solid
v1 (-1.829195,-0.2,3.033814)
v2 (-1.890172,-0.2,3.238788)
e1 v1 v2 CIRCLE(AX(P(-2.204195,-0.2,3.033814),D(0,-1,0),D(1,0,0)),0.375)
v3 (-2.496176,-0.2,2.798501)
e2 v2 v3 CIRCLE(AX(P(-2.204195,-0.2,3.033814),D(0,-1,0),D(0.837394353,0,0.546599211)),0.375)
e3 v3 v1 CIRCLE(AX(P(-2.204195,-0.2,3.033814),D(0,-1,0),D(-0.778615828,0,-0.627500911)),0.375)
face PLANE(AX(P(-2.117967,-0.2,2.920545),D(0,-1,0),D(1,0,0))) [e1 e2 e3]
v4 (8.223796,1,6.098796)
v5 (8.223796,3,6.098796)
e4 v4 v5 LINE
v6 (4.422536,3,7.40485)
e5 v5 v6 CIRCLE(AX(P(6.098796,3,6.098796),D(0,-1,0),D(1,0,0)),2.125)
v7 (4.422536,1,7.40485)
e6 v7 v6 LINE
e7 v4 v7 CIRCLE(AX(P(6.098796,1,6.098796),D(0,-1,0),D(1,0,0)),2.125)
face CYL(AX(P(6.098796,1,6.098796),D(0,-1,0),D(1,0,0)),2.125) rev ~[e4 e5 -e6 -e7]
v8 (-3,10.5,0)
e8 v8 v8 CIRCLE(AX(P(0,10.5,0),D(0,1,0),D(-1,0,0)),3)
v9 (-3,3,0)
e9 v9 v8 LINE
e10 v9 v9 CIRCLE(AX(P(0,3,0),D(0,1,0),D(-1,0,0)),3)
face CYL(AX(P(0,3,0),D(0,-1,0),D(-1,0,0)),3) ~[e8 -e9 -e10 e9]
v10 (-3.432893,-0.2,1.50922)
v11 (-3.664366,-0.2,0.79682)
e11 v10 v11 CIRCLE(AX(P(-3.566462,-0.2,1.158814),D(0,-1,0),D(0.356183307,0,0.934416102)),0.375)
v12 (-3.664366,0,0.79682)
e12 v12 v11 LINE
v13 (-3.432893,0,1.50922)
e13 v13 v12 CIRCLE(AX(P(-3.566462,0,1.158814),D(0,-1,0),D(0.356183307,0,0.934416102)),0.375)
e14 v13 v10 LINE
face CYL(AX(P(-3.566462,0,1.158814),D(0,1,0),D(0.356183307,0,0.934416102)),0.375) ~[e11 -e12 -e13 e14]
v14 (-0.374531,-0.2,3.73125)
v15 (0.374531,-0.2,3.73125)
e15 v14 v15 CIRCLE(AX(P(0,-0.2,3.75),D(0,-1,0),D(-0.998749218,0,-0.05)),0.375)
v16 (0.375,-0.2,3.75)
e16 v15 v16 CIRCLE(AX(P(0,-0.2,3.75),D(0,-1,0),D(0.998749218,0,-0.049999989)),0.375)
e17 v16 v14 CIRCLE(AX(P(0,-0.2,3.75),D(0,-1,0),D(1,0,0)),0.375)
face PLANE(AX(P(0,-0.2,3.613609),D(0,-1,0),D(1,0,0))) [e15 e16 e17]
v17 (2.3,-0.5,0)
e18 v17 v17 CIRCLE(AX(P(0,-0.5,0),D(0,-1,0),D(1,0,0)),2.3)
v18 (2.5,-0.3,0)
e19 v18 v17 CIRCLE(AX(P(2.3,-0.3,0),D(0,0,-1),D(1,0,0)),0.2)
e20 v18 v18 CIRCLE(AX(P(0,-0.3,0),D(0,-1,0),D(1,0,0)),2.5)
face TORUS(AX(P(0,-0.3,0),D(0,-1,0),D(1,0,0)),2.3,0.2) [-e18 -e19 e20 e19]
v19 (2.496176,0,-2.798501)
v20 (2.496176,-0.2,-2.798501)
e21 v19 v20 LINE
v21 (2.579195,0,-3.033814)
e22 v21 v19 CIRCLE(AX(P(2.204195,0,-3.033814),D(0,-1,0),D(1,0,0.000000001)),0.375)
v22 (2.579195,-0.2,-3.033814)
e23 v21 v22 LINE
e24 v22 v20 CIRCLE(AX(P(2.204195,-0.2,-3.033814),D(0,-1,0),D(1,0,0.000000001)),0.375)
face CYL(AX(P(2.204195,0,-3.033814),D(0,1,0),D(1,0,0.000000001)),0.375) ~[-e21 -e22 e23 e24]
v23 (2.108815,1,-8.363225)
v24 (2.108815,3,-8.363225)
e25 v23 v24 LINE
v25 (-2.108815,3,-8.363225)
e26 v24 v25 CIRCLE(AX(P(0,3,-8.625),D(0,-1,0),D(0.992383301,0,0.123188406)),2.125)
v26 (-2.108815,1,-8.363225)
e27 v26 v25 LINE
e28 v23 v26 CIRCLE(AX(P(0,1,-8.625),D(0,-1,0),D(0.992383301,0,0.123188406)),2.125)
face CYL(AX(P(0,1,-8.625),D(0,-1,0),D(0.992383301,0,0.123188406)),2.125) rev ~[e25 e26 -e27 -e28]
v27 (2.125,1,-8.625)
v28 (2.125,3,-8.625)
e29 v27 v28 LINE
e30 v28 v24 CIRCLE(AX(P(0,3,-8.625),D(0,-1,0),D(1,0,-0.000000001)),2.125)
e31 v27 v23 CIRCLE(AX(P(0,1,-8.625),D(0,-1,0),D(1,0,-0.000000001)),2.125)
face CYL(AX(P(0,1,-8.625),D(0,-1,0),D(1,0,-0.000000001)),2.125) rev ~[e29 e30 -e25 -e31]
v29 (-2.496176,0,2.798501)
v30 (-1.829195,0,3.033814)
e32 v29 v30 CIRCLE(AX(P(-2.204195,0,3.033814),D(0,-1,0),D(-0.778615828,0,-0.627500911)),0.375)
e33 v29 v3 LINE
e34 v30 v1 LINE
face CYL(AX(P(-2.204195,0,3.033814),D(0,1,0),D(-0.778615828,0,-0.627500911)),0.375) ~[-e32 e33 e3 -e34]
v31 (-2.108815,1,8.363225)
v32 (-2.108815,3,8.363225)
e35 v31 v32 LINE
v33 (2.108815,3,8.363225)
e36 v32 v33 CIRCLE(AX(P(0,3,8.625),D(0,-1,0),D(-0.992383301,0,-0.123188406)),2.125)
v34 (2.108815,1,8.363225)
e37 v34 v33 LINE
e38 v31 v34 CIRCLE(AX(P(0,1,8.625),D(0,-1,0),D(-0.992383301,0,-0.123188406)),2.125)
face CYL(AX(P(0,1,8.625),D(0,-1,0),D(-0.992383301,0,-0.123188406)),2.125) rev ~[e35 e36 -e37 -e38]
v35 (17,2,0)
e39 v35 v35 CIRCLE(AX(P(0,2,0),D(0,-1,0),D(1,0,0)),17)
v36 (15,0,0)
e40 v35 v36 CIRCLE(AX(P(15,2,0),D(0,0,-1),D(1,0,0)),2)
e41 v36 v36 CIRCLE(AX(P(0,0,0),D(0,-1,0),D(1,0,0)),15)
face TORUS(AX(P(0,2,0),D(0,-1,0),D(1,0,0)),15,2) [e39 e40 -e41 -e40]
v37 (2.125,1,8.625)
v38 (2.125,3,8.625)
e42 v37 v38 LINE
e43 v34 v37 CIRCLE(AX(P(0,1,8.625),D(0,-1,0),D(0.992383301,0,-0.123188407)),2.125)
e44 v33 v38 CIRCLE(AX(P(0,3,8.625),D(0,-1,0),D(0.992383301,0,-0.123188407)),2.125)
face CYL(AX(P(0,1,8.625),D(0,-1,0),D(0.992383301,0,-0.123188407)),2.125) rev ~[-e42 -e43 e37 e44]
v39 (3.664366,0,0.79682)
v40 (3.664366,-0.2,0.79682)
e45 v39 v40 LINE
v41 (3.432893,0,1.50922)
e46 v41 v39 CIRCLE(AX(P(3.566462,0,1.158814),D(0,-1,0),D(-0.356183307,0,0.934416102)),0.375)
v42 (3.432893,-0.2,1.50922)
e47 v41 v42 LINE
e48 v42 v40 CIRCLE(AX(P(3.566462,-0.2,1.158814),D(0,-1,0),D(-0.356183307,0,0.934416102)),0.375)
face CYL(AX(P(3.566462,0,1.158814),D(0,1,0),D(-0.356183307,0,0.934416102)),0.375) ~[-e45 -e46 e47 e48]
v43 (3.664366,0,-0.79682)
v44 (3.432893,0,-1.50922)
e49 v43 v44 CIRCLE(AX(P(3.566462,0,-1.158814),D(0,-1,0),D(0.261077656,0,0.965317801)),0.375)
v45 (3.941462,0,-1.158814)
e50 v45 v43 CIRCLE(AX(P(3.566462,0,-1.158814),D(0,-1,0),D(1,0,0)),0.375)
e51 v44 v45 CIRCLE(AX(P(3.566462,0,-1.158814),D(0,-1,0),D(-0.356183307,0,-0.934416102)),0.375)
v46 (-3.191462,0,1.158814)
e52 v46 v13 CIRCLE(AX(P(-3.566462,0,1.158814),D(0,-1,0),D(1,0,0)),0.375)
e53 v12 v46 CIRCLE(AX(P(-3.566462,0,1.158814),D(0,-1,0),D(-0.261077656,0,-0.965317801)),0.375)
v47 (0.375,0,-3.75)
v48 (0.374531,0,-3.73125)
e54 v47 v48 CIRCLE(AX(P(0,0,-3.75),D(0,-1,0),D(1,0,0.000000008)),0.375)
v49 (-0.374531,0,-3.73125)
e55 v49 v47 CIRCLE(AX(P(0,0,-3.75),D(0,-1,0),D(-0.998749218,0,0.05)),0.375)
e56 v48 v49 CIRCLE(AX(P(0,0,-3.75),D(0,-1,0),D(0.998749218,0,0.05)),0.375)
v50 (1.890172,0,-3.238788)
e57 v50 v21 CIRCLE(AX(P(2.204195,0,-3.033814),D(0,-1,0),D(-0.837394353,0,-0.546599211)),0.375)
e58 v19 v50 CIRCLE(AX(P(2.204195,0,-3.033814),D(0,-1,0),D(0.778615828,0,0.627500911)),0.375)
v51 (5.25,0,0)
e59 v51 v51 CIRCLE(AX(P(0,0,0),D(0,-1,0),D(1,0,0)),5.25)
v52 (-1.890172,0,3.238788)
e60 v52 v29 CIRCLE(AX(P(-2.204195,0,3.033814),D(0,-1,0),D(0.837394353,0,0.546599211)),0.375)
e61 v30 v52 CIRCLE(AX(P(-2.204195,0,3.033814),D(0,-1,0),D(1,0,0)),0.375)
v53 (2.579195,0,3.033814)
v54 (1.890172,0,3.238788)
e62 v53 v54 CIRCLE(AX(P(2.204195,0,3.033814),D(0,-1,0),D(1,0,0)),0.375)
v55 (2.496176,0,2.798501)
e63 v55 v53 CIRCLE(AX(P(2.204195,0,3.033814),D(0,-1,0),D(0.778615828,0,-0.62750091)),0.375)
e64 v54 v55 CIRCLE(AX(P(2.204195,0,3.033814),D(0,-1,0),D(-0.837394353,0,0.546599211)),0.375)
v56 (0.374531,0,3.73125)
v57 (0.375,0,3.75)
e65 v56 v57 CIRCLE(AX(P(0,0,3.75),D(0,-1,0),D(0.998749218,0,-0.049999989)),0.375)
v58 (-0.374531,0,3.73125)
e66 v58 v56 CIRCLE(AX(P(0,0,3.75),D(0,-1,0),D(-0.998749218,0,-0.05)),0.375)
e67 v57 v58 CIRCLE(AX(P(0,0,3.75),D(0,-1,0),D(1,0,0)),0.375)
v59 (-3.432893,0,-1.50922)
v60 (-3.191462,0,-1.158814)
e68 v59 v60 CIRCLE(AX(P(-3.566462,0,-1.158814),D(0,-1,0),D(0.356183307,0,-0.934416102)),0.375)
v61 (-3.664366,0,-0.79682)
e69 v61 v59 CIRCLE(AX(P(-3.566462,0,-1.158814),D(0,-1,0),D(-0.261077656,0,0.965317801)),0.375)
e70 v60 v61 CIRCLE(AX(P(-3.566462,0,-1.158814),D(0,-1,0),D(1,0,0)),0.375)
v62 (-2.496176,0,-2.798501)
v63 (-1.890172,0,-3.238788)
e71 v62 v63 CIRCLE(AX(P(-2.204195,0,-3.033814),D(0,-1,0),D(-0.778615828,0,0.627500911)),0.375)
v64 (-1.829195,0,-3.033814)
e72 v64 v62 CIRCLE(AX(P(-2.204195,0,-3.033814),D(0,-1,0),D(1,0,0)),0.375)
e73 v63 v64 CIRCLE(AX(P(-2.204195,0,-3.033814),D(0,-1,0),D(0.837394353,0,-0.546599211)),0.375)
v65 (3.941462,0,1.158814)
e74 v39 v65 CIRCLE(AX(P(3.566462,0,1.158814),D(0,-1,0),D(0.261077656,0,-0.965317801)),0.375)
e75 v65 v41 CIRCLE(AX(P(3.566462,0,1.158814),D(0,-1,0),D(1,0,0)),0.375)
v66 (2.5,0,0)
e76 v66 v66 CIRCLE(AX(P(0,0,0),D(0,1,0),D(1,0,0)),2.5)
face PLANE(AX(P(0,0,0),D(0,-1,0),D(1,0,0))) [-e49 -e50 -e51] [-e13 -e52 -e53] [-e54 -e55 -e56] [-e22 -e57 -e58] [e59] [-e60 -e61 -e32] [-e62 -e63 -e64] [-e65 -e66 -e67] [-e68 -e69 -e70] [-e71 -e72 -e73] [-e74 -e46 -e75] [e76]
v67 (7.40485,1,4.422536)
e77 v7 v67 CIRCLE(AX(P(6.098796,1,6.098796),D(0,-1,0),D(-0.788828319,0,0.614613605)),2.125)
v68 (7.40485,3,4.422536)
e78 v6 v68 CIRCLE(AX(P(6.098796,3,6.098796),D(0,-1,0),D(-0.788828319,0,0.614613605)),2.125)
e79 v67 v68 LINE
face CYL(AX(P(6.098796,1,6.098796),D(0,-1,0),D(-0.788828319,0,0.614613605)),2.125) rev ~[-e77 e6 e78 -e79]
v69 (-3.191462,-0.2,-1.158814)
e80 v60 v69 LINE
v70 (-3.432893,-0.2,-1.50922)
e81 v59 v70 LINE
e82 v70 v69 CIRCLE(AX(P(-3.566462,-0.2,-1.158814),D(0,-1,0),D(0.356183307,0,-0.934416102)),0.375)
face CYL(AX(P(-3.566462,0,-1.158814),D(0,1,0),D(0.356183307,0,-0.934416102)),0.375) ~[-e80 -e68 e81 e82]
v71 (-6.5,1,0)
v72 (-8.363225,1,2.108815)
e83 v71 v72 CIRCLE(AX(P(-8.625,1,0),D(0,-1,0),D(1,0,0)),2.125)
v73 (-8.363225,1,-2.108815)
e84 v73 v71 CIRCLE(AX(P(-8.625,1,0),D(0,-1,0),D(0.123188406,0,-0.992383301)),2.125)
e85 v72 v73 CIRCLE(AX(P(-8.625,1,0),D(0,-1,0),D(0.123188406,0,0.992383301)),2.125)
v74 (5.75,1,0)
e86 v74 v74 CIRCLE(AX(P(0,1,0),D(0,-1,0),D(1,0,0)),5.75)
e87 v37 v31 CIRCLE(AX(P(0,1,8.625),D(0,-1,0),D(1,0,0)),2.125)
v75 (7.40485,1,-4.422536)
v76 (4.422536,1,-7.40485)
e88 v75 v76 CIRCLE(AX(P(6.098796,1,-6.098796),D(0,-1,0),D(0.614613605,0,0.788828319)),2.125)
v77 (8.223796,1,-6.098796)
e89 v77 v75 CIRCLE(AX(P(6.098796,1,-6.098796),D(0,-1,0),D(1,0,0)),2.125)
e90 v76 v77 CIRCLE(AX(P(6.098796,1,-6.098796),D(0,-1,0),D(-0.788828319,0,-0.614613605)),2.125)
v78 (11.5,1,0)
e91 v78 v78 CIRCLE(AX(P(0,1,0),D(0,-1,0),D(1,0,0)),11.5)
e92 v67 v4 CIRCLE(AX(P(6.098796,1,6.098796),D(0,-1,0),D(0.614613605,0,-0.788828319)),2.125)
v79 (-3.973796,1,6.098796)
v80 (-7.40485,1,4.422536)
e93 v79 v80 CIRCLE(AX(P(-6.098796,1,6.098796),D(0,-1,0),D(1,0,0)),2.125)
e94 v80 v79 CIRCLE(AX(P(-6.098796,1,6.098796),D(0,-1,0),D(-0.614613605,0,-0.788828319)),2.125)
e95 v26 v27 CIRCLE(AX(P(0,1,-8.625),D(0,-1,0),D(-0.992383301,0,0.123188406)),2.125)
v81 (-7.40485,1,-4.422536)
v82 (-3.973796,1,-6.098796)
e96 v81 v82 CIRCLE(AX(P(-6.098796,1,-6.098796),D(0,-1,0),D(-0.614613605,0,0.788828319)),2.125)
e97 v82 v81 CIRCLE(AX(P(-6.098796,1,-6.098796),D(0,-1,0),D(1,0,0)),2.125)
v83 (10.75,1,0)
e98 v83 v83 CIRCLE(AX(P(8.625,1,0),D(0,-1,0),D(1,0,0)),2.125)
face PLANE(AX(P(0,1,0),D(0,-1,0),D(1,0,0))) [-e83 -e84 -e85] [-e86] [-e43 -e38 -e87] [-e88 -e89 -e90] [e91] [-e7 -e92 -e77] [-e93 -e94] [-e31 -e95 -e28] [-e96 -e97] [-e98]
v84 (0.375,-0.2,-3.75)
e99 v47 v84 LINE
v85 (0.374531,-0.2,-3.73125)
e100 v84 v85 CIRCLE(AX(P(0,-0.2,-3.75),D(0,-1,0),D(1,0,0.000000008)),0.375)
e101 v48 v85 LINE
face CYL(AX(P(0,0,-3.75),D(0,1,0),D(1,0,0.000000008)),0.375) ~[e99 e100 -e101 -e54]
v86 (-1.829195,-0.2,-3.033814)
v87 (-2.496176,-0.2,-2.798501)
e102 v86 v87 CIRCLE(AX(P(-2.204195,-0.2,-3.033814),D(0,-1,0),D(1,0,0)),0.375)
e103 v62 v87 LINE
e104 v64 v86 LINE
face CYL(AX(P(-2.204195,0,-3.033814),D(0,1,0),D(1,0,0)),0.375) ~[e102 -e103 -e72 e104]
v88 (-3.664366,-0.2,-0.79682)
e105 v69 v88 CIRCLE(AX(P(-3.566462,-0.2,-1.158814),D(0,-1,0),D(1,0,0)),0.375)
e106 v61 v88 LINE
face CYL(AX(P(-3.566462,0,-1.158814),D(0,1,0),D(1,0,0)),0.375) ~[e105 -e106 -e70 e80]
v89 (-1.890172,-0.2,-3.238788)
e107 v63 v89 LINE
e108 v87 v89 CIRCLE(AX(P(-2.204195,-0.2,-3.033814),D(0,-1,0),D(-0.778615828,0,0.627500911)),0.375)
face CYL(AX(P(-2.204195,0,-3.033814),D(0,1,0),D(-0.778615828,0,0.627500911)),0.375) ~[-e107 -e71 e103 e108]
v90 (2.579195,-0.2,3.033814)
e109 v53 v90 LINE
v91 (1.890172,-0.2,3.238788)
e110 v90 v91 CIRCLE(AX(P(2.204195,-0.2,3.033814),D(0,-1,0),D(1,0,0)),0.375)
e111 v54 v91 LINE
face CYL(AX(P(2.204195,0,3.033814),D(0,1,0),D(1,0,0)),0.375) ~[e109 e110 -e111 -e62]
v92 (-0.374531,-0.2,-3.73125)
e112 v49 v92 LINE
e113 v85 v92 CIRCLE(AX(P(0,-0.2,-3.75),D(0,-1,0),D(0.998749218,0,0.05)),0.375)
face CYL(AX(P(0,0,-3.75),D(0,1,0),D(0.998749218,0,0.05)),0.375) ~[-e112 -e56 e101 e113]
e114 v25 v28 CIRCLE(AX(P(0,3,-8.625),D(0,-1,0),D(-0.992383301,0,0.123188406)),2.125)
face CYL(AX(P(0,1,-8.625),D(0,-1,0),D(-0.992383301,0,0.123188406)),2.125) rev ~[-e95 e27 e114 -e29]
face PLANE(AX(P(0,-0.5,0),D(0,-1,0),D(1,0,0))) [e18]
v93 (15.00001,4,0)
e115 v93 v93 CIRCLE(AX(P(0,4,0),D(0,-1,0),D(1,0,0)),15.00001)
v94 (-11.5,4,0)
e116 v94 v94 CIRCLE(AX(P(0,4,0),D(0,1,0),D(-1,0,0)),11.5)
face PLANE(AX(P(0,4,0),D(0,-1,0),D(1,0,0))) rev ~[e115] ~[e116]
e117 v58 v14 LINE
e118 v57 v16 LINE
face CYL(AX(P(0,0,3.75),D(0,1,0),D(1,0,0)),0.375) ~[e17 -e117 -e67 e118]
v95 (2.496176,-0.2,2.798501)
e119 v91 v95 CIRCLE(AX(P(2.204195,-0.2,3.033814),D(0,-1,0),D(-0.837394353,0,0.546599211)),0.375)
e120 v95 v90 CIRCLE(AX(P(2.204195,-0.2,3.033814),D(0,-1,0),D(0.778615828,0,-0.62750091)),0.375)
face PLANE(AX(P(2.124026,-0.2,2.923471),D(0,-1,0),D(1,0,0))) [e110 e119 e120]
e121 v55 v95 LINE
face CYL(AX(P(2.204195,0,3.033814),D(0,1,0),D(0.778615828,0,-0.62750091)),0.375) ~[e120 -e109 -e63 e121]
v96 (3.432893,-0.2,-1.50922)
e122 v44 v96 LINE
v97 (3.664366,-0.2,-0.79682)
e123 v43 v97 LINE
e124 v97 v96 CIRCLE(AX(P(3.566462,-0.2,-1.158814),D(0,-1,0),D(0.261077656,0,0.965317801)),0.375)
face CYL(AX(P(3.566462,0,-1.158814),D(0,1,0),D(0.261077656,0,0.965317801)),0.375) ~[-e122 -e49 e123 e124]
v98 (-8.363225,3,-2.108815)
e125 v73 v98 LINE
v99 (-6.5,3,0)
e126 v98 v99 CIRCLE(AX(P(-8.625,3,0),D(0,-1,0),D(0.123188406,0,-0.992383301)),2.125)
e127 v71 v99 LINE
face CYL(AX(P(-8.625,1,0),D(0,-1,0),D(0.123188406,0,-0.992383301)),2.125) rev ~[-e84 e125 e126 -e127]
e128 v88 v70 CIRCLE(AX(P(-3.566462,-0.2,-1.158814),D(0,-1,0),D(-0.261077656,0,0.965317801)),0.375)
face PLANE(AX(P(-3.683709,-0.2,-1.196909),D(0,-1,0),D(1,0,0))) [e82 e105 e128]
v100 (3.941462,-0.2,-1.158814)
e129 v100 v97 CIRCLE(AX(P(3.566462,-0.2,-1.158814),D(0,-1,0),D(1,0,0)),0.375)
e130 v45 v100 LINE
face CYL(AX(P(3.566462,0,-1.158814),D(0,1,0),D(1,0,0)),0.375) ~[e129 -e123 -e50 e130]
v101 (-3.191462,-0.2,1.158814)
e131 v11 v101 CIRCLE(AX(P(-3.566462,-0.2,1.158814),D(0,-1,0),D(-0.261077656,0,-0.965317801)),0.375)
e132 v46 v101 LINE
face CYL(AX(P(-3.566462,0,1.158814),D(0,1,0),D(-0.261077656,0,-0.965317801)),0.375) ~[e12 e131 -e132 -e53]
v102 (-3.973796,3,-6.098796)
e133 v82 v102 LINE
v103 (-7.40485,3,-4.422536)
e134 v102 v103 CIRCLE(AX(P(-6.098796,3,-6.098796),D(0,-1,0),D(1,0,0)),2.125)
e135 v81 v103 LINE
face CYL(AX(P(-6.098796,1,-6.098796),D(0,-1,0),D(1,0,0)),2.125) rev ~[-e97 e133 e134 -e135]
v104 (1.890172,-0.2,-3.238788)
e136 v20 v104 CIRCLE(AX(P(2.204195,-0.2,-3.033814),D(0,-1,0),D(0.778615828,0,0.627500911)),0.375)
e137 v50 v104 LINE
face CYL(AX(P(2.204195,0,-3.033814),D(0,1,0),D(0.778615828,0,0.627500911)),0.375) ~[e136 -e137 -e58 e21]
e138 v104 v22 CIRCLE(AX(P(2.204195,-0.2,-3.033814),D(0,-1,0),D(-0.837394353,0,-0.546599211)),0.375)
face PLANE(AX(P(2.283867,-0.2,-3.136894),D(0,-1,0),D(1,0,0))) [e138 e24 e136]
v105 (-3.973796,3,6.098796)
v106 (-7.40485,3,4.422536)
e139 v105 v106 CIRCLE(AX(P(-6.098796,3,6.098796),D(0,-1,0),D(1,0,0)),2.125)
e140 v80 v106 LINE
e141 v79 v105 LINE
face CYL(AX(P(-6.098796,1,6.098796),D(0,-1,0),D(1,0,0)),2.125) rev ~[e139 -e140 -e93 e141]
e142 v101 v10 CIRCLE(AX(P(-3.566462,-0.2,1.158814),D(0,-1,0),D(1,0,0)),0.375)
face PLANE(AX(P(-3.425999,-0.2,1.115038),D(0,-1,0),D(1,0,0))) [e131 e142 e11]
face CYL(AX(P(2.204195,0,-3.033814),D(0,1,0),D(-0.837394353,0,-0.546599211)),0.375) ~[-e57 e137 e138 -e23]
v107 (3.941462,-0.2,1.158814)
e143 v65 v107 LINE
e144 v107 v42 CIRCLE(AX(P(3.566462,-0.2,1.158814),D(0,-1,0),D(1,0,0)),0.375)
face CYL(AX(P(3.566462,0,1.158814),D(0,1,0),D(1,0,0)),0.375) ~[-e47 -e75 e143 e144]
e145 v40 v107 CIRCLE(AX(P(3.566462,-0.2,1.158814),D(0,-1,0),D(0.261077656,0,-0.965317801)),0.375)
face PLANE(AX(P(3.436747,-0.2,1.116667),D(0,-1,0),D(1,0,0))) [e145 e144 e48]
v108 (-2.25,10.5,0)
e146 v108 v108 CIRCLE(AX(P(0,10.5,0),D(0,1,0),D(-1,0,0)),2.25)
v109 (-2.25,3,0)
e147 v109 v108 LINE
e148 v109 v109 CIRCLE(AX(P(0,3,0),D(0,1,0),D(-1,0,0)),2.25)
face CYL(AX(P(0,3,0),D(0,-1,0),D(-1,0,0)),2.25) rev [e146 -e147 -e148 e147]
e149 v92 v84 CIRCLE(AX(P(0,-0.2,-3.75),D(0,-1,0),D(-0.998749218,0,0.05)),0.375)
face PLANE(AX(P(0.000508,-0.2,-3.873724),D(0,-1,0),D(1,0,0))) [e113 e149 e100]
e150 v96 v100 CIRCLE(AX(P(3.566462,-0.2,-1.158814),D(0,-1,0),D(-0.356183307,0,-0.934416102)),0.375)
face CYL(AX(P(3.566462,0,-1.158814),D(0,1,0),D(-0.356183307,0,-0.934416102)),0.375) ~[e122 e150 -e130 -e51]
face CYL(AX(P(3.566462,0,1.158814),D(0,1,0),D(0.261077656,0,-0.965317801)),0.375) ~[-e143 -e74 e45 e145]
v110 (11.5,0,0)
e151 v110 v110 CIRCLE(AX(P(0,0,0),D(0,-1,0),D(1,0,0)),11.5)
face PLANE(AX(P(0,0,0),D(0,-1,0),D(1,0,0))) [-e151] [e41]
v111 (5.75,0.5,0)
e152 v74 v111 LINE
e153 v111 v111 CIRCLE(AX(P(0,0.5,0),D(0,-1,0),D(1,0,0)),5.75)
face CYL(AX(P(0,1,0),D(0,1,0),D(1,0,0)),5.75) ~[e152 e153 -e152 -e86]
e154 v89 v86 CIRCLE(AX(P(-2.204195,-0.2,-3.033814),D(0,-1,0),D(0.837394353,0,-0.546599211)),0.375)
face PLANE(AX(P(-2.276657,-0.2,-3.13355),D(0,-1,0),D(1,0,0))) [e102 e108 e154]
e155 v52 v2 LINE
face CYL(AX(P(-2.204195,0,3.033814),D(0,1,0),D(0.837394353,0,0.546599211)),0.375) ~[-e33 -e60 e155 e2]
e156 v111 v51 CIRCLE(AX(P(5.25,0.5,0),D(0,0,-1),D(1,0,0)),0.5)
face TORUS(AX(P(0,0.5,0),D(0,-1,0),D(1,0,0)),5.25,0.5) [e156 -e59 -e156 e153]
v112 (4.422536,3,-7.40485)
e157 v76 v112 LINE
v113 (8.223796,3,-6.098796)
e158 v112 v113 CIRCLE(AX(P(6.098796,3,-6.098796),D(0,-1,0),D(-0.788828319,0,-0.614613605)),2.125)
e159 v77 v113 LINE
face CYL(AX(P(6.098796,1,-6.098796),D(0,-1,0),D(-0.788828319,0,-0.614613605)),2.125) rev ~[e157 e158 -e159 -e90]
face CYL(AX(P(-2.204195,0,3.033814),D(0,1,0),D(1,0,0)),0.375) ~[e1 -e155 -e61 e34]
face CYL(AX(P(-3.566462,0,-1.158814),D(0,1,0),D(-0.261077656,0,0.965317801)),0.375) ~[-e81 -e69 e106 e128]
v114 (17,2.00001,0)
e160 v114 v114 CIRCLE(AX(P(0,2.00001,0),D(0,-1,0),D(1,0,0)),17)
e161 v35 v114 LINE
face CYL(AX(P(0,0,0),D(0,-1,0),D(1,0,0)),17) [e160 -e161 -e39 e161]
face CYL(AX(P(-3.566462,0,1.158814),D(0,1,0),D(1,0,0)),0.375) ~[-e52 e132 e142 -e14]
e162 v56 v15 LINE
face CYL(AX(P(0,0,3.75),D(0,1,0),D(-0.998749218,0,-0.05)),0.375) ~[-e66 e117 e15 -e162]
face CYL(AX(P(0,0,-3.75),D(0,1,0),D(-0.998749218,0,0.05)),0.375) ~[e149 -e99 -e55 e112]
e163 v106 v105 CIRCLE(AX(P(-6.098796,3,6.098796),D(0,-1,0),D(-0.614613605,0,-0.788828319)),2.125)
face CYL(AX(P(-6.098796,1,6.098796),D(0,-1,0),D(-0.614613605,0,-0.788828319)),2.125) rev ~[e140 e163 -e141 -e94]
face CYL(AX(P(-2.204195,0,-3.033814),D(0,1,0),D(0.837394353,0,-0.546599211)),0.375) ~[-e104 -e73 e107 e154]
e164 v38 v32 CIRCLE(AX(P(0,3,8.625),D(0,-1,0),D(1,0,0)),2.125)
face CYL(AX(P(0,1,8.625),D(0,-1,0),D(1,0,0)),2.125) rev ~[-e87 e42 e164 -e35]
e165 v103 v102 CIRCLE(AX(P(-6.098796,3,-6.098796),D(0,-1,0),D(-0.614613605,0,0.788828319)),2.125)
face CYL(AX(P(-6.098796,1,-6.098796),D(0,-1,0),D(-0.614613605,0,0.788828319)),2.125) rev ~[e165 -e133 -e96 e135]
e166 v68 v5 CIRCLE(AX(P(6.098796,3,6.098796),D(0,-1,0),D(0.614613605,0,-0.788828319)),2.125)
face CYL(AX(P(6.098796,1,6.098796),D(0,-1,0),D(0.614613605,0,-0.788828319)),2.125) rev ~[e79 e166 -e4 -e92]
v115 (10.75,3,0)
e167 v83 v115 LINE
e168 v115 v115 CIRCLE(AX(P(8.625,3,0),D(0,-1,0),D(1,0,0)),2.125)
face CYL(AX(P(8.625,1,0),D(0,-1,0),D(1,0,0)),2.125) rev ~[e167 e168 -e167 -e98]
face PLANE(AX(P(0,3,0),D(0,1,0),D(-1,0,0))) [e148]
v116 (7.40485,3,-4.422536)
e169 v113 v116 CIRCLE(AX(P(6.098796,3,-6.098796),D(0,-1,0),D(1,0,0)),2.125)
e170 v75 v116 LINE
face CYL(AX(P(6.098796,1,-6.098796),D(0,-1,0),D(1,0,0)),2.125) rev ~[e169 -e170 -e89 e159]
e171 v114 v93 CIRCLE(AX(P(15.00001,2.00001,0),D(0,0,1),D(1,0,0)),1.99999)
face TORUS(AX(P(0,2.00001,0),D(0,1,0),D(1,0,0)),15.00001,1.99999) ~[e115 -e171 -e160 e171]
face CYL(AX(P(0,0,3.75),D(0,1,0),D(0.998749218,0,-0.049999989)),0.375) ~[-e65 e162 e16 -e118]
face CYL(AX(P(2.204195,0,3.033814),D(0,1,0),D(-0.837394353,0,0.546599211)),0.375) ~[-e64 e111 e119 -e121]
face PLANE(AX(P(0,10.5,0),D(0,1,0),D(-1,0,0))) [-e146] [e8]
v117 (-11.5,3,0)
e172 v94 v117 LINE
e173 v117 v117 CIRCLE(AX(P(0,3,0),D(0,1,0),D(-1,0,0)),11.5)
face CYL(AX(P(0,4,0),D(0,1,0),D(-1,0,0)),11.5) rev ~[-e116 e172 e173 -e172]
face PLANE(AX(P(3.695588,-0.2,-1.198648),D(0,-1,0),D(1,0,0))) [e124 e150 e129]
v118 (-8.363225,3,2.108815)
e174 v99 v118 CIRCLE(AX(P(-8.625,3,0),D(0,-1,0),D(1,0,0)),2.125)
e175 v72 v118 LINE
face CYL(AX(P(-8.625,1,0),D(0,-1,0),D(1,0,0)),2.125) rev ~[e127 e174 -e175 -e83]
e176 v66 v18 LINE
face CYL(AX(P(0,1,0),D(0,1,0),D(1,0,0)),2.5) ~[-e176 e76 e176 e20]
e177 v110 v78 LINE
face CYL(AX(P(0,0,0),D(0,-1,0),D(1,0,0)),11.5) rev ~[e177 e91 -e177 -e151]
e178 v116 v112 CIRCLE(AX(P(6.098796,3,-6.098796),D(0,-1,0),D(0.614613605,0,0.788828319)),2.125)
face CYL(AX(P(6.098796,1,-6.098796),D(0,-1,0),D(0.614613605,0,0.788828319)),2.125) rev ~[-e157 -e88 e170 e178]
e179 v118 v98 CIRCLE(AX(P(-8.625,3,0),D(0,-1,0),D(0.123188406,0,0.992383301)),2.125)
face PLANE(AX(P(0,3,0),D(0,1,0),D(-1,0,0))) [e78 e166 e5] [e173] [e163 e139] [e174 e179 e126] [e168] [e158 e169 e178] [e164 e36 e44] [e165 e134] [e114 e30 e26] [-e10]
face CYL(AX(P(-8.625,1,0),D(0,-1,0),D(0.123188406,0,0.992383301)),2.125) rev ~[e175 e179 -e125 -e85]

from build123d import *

# Parameters (mm, degrees)
F0_R      = 17
F1_DEPTH  = 4
F2_R      = 11.5
F3_DEPTH  = 1
F4_R      = 11.5
F5_DEPTH  = 1
F6_R      = 2
F7_R      = 1.99999
F8_R      = 2.5
F9_DEPTH  = 1.5
F10_R     = 5.75
F11_DEPTH = 1
F12_R     = 0.5
F13_R     = 0.2
F15_DEPTH = 25.4
F16_R     = 3
F16_R_2   = 2.25
F17_DEPTH = 7.5
F19_DEPTH = 0.2


# Not quite as in the source:
# - a fillet or chamfer is up to 0.001 mm smaller than in the source, because OpenCascade refuses the exact size


with BuildPart() as f1:
    # F0 (on Front) → F1 (new body)
    with BuildSketch(Plane.XZ):
        Circle(F0_R)
    extrude(amount=-F1_DEPTH)

    # F2 (on face) → F3 (cut)
    with BuildSketch(Plane.XZ):
        Circle(F2_R)
    extrude(amount=-F3_DEPTH, mode=Mode.SUBTRACT)

    # F4 (on face) → F5 (cut)
    with BuildSketch(Plane(origin=(0, 4, 0), x_dir=(-1, 0, 0), z_dir=(0, 1, 0))):
        Circle(F4_R)
    extrude(amount=-F5_DEPTH, mode=Mode.SUBTRACT)

    # F6
    f6_edges = [f1.edges().sort_by_distance(p)[0] for p in [
        (-17, 0, 0),
    ]]
    fillet(f6_edges, radius=F6_R)

    # F7 (radius 2 in the source; OpenCascade refuses exactly that, so slightly less here)
    f7_edges = [f1.edges().sort_by_distance(p)[0] for p in [
        (-17, 4, 0),
    ]]
    fillet(f7_edges, radius=F7_R)

    # F8 (on face) → F9 (join)
    with BuildSketch(Plane.XZ.offset(-1)):
        Circle(F8_R)
    extrude(amount=F9_DEPTH)

    # F10 (on face) → F11 (join)
    with BuildSketch(Plane.XZ.offset(-1)):
        Circle(F10_R)
    extrude(amount=F11_DEPTH)

    # F12
    f12_edges = [f1.edges().sort_by_distance(p)[0] for p in [
        (-5.75, 0, 0),
    ]]
    fillet(f12_edges, radius=F12_R)

    # F13
    f13_edges = [f1.edges().sort_by_distance(p)[0] for p in [
        (-2.5, -0.5, 0),
    ]]
    fillet(f13_edges, radius=F13_R)

    # F14 (on face) → F15 (cut)
    with BuildSketch(Plane.XZ.offset(-1)):
        with BuildLine():
            ThreePointArc((-2.1088145152, 8.3632246377), (0, 6.5), (2.1088145152, 8.3632246377))
            ThreePointArc((2.1088145152, 8.3632246377), (0, 8.625), (-2.1088145152, 8.3632246377))
        make_face()
        with BuildLine():
            ThreePointArc((-2.1088145152, 8.3632246377), (0, 8.625), (2.1088145152, 8.3632246377))
            ThreePointArc((2.1088145152, 8.3632246377), (2.120949769, 8.4938623717), (2.125, 8.625))
            ThreePointArc((2.125, 8.625), (-0.1311376283, 10.745949769), (-2.1088145152, 8.3632246377))
        make_face()
        with BuildLine():
            ThreePointArc((-3.9737959877, 6.0987959877), (-4.089109709, 6.7892929545), (-4.4225358099, 7.4048498979))
            ThreePointArc((-4.4225358099, 7.4048498979), (-6.0987959877, 6.0987959877), (-7.4048498979, 4.4225358099))
            ThreePointArc((-7.4048498979, 4.4225358099), (-5.1659882795, 4.1894781044), (-3.9737959877, 6.0987959877))
        make_face()
        with BuildLine():
            ThreePointArc((-7.4048498979, 4.4225358099), (-6.0987959877, 6.0987959877), (-4.4225358099, 7.4048498979))
            ThreePointArc((-4.4225358099, 7.4048498979), (-7.6013978978, 7.6013978978), (-7.4048498979, 4.4225358099))
        make_face()
        with BuildLine():
            ThreePointArc((-6.5, 0), (-7.0325337296, 1.4070096579), (-8.3632246377, 2.1088145152))
            ThreePointArc((-8.3632246377, 2.1088145152), (-8.625, 0), (-8.3632246377, -2.1088145152))
            ThreePointArc((-8.3632246377, -2.1088145152), (-7.0325337296, -1.4070096579), (-6.5, 0))
        make_face()
        with BuildLine():
            ThreePointArc((-8.3632246377, -2.1088145152), (-8.625, 0), (-8.3632246377, 2.1088145152))
            ThreePointArc((-8.3632246377, 2.1088145152), (-10.75, 0), (-8.3632246377, -2.1088145152))
        make_face()
        with BuildLine():
            ThreePointArc((-7.4048498979, -4.4225358099), (-7.6013978978, -7.6013978978), (-4.4225358099, -7.4048498979))
            ThreePointArc((-4.4225358099, -7.4048498979), (-6.0987959877, -6.0987959877), (-7.4048498979, -4.4225358099))
        make_face()
        with BuildLine():
            ThreePointArc((-7.4048498979, -4.4225358099), (-6.0987959877, -6.0987959877), (-4.4225358099, -7.4048498979))
            ThreePointArc((-4.4225358099, -7.4048498979), (-4.089109709, -6.7892929545), (-3.9737959877, -6.0987959877))
            ThreePointArc((-3.9737959877, -6.0987959877), (-5.1659882795, -4.1894781044), (-7.4048498979, -4.4225358099))
        make_face()
        with BuildLine():
            ThreePointArc((2.125, -8.625), (2.120949769, -8.4938623717), (2.1088145152, -8.3632246377))
            ThreePointArc((2.1088145152, -8.3632246377), (0, -8.625), (-2.1088145152, -8.3632246377))
            ThreePointArc((-2.1088145152, -8.3632246377), (-0.1311376283, -10.745949769), (2.125, -8.625))
        make_face()
        with BuildLine():
            ThreePointArc((-2.1088145152, -8.3632246377), (0, -8.625), (2.1088145152, -8.3632246377))
            ThreePointArc((2.1088145152, -8.3632246377), (0, -6.5), (-2.1088145152, -8.3632246377))
        make_face()
        with BuildLine():
            ThreePointArc((8.2237959877, -6.0987959877), (8.008113871, -5.1659882795), (7.4048498979, -4.4225358099))
            ThreePointArc((7.4048498979, -4.4225358099), (6.0987959877, -6.0987959877), (4.4225358099, -7.4048498979))
            ThreePointArc((4.4225358099, -7.4048498979), (6.7892929545, -8.1084822665), (8.2237959877, -6.0987959877))
        make_face()
        with BuildLine():
            ThreePointArc((4.4225358099, -7.4048498979), (6.0987959877, -6.0987959877), (7.4048498979, -4.4225358099))
            ThreePointArc((7.4048498979, -4.4225358099), (4.5961940777, -4.5961940777), (4.4225358099, -7.4048498979))
        make_face()
        with BuildLine():
            ThreePointArc((8.3632246377, -2.1088145152), (8.5593059736, -1.0625), (8.625, 0))
            ThreePointArc((8.625, 0), (8.5593059736, 1.0625), (8.3632246377, 2.1088145152))
            ThreePointArc((8.3632246377, 2.1088145152), (6.5, 0), (8.3632246377, -2.1088145152))
        make_face()
        with BuildLine():
            ThreePointArc((8.3632246377, 2.1088145152), (8.5593059736, 1.0625), (8.625, 0))
            ThreePointArc((8.625, 0), (8.5593059736, -1.0625), (8.3632246377, -2.1088145152))
            ThreePointArc((8.3632246377, -2.1088145152), (10.0320096579, -1.5924662704), (10.75, 0))
            ThreePointArc((10.75, 0), (10.0320096579, 1.5924662704), (8.3632246377, 2.1088145152))
        make_face()
        with BuildLine():
            ThreePointArc((4.4225358099, 7.4048498979), (6.0987959877, 6.0987959877), (7.4048498979, 4.4225358099))
            ThreePointArc((7.4048498979, 4.4225358099), (8.008113871, 5.1659882795), (8.2237959877, 6.0987959877))
            ThreePointArc((8.2237959877, 6.0987959877), (6.7892929545, 8.1084822665), (4.4225358099, 7.4048498979))
        make_face()
        with BuildLine():
            ThreePointArc((4.4225358099, 7.4048498979), (4.5961940777, 4.5961940777), (7.4048498979, 4.4225358099))
            ThreePointArc((7.4048498979, 4.4225358099), (6.0987959877, 6.0987959877), (4.4225358099, 7.4048498979))
        make_face()
    extrude(amount=-F15_DEPTH, mode=Mode.SUBTRACT)

    # F16 (on face) → F17 (join)
    with BuildSketch(Plane(origin=(0, 3, 0), x_dir=(-1, 0, 0), z_dir=(0, 1, 0))):
        Circle(F16_R)
        Circle(F16_R_2, mode=Mode.SUBTRACT)
    extrude(amount=F17_DEPTH)

    # F18 (on face) → F19 (join)
    with BuildSketch(Plane.XZ):
        with BuildLine():
            ThreePointArc((3.4328931959, 1.5092197672), (3.2098157425, 1.042932356), (3.664366057, 0.7968195534))
            ThreePointArc((3.664366057, 0.7968195534), (3.5664619361, 1.1588137289), (3.4328931959, 1.5092197672))
        make_face()
        with BuildLine():
            ThreePointArc((3.4328931959, 1.5092197672), (3.5664619361, 1.1588137289), (3.664366057, 0.7968195534))
            ThreePointArc((3.664366057, 0.7968195534), (3.8642362175, 0.9308762872), (3.9414619361, 1.1588137289))
            ThreePointArc((3.9414619361, 1.1588137289), (3.7792255637, 1.4676124316), (3.4328931959, 1.5092197672))
        make_face()
        with BuildLine():
            ThreePointArc((3.9414619361, -1.1588137289), (3.8642362175, -0.9308762872), (3.664366057, -0.7968195534))
            ThreePointArc((3.664366057, -0.7968195534), (3.5664619361, -1.1588137289), (3.4328931959, -1.5092197672))
            ThreePointArc((3.4328931959, -1.5092197672), (3.7792255637, -1.4676124316), (3.9414619361, -1.1588137289))
        make_face()
        with BuildLine():
            ThreePointArc((3.4328931959, -1.5092197672), (3.5664619361, -1.1588137289), (3.664366057, -0.7968195534))
            ThreePointArc((3.664366057, -0.7968195534), (3.2098157425, -1.042932356), (3.4328931959, -1.5092197672))
        make_face()
        with BuildLine():
            ThreePointArc((1.8901718138, 3.2387884331), (1.9837752265, 2.730432356), (2.4961756315, 2.7985008874))
            ThreePointArc((2.4961756315, 2.7985008874), (2.2041946961, 3.0338137289), (1.8901718138, 3.2387884331))
        make_face()
        with BuildLine():
            ThreePointArc((1.8901718138, 3.2387884331), (2.2041946961, 3.0338137289), (2.4961756315, 2.7985008874))
            ThreePointArc((2.4961756315, 2.7985008874), (2.5578314099, 2.9090496531), (2.5791946961, 3.0338137289))
            ThreePointArc((2.5791946961, 3.0338137289), (2.3111208835, 3.393246324), (1.8901718138, 3.2387884331))
        make_face()
        with BuildLine():
            ThreePointArc((2.5791946961, -3.0338137289), (2.5578314099, -2.9090496531), (2.4961756315, -2.7985008874))
            ThreePointArc((2.4961756315, -2.7985008874), (2.2041946961, -3.0338137289), (1.8901718138, -3.2387884331))
            ThreePointArc((1.8901718138, -3.2387884331), (2.3111208835, -3.393246324), (2.5791946961, -3.0338137289))
        make_face()
        with BuildLine():
            ThreePointArc((1.8901718138, -3.2387884331), (2.2041946961, -3.0338137289), (2.4961756315, -2.7985008874))
            ThreePointArc((2.4961756315, -2.7985008874), (1.9837752265, -2.730432356), (1.8901718138, -3.2387884331))
        make_face()
        with BuildLine():
            ThreePointArc((-0.3745309567, 3.73125), (0, 3.375), (0.3745309567, 3.73125))
            ThreePointArc((0.3745309567, 3.73125), (0, 3.75), (-0.3745309567, 3.73125))
        make_face()
        with BuildLine():
            ThreePointArc((-0.3745309567, 3.73125), (0, 3.75), (0.3745309567, 3.73125))
            ThreePointArc((0.3745309567, 3.73125), (0.3748827208, 3.7406220671), (0.375, 3.75))
            ThreePointArc((0.375, 3.75), (-0.0093779329, 4.1248827208), (-0.3745309567, 3.73125))
        make_face()
        with BuildLine():
            ThreePointArc((0.375, -3.75), (0.3748827208, -3.7406220671), (0.3745309567, -3.73125))
            ThreePointArc((0.3745309567, -3.73125), (0, -3.75), (-0.3745309567, -3.73125))
            ThreePointArc((-0.3745309567, -3.73125), (-0.0093779329, -4.1248827208), (0.375, -3.75))
        make_face()
        with BuildLine():
            ThreePointArc((-0.3745309567, -3.73125), (0, -3.75), (0.3745309567, -3.73125))
            ThreePointArc((0.3745309567, -3.73125), (0, -3.375), (-0.3745309567, -3.73125))
        make_face()
        with BuildLine():
            ThreePointArc((-1.8291946961, 3.0338137289), (-1.844762101, 3.1407399163), (-1.8901718138, 3.2387884331))
            ThreePointArc((-1.8901718138, 3.2387884331), (-2.2041946961, 3.0338137289), (-2.4961756315, 2.7985008874))
            ThreePointArc((-2.4961756315, 2.7985008874), (-2.0794306203, 2.6801770151), (-1.8291946961, 3.0338137289))
        make_face()
        with BuildLine():
            ThreePointArc((-2.4961756315, 2.7985008874), (-2.2041946961, 3.0338137289), (-1.8901718138, 3.2387884331))
            ThreePointArc((-1.8901718138, 3.2387884331), (-2.4246141657, 3.3371951018), (-2.4961756315, 2.7985008874))
        make_face()
        with BuildLine():
            ThreePointArc((-2.4961756315, -2.7985008874), (-2.4246141657, -3.3371951018), (-1.8901718138, -3.2387884331))
            ThreePointArc((-1.8901718138, -3.2387884331), (-2.2041946961, -3.0338137289), (-2.4961756315, -2.7985008874))
        make_face()
        with BuildLine():
            ThreePointArc((-2.4961756315, -2.7985008874), (-2.2041946961, -3.0338137289), (-1.8901718138, -3.2387884331))
            ThreePointArc((-1.8901718138, -3.2387884331), (-1.844762101, -3.1407399163), (-1.8291946961, -3.0338137289))
            ThreePointArc((-1.8291946961, -3.0338137289), (-2.0794306203, -2.6801770151), (-2.4961756315, -2.7985008874))
        make_face()
        with BuildLine():
            ThreePointArc((-3.1914619361, 1.1588137289), (-3.2576632334, 1.3715773565), (-3.4328931959, 1.5092197672))
            ThreePointArc((-3.4328931959, 1.5092197672), (-3.5664619361, 1.1588137289), (-3.664366057, 0.7968195534))
            ThreePointArc((-3.664366057, 0.7968195534), (-3.3385244944, 0.8610394475), (-3.1914619361, 1.1588137289))
        make_face()
        with BuildLine():
            ThreePointArc((-3.664366057, 0.7968195534), (-3.5664619361, 1.1588137289), (-3.4328931959, 1.5092197672))
            ThreePointArc((-3.4328931959, 1.5092197672), (-3.9231081297, 1.2746951018), (-3.664366057, 0.7968195534))
        make_face()
        with BuildLine():
            ThreePointArc((-3.664366057, -0.7968195534), (-3.9231081297, -1.2746951018), (-3.4328931959, -1.5092197672))
            ThreePointArc((-3.4328931959, -1.5092197672), (-3.5664619361, -1.1588137289), (-3.664366057, -0.7968195534))
        make_face()
        with BuildLine():
            ThreePointArc((-3.664366057, -0.7968195534), (-3.5664619361, -1.1588137289), (-3.4328931959, -1.5092197672))
            ThreePointArc((-3.4328931959, -1.5092197672), (-3.2576632334, -1.3715773565), (-3.1914619361, -1.1588137289))
            ThreePointArc((-3.1914619361, -1.1588137289), (-3.3385244944, -0.8610394475), (-3.664366057, -0.7968195534))
        make_face()
    extrude(amount=F19_DEPTH)


solid = f1.part
